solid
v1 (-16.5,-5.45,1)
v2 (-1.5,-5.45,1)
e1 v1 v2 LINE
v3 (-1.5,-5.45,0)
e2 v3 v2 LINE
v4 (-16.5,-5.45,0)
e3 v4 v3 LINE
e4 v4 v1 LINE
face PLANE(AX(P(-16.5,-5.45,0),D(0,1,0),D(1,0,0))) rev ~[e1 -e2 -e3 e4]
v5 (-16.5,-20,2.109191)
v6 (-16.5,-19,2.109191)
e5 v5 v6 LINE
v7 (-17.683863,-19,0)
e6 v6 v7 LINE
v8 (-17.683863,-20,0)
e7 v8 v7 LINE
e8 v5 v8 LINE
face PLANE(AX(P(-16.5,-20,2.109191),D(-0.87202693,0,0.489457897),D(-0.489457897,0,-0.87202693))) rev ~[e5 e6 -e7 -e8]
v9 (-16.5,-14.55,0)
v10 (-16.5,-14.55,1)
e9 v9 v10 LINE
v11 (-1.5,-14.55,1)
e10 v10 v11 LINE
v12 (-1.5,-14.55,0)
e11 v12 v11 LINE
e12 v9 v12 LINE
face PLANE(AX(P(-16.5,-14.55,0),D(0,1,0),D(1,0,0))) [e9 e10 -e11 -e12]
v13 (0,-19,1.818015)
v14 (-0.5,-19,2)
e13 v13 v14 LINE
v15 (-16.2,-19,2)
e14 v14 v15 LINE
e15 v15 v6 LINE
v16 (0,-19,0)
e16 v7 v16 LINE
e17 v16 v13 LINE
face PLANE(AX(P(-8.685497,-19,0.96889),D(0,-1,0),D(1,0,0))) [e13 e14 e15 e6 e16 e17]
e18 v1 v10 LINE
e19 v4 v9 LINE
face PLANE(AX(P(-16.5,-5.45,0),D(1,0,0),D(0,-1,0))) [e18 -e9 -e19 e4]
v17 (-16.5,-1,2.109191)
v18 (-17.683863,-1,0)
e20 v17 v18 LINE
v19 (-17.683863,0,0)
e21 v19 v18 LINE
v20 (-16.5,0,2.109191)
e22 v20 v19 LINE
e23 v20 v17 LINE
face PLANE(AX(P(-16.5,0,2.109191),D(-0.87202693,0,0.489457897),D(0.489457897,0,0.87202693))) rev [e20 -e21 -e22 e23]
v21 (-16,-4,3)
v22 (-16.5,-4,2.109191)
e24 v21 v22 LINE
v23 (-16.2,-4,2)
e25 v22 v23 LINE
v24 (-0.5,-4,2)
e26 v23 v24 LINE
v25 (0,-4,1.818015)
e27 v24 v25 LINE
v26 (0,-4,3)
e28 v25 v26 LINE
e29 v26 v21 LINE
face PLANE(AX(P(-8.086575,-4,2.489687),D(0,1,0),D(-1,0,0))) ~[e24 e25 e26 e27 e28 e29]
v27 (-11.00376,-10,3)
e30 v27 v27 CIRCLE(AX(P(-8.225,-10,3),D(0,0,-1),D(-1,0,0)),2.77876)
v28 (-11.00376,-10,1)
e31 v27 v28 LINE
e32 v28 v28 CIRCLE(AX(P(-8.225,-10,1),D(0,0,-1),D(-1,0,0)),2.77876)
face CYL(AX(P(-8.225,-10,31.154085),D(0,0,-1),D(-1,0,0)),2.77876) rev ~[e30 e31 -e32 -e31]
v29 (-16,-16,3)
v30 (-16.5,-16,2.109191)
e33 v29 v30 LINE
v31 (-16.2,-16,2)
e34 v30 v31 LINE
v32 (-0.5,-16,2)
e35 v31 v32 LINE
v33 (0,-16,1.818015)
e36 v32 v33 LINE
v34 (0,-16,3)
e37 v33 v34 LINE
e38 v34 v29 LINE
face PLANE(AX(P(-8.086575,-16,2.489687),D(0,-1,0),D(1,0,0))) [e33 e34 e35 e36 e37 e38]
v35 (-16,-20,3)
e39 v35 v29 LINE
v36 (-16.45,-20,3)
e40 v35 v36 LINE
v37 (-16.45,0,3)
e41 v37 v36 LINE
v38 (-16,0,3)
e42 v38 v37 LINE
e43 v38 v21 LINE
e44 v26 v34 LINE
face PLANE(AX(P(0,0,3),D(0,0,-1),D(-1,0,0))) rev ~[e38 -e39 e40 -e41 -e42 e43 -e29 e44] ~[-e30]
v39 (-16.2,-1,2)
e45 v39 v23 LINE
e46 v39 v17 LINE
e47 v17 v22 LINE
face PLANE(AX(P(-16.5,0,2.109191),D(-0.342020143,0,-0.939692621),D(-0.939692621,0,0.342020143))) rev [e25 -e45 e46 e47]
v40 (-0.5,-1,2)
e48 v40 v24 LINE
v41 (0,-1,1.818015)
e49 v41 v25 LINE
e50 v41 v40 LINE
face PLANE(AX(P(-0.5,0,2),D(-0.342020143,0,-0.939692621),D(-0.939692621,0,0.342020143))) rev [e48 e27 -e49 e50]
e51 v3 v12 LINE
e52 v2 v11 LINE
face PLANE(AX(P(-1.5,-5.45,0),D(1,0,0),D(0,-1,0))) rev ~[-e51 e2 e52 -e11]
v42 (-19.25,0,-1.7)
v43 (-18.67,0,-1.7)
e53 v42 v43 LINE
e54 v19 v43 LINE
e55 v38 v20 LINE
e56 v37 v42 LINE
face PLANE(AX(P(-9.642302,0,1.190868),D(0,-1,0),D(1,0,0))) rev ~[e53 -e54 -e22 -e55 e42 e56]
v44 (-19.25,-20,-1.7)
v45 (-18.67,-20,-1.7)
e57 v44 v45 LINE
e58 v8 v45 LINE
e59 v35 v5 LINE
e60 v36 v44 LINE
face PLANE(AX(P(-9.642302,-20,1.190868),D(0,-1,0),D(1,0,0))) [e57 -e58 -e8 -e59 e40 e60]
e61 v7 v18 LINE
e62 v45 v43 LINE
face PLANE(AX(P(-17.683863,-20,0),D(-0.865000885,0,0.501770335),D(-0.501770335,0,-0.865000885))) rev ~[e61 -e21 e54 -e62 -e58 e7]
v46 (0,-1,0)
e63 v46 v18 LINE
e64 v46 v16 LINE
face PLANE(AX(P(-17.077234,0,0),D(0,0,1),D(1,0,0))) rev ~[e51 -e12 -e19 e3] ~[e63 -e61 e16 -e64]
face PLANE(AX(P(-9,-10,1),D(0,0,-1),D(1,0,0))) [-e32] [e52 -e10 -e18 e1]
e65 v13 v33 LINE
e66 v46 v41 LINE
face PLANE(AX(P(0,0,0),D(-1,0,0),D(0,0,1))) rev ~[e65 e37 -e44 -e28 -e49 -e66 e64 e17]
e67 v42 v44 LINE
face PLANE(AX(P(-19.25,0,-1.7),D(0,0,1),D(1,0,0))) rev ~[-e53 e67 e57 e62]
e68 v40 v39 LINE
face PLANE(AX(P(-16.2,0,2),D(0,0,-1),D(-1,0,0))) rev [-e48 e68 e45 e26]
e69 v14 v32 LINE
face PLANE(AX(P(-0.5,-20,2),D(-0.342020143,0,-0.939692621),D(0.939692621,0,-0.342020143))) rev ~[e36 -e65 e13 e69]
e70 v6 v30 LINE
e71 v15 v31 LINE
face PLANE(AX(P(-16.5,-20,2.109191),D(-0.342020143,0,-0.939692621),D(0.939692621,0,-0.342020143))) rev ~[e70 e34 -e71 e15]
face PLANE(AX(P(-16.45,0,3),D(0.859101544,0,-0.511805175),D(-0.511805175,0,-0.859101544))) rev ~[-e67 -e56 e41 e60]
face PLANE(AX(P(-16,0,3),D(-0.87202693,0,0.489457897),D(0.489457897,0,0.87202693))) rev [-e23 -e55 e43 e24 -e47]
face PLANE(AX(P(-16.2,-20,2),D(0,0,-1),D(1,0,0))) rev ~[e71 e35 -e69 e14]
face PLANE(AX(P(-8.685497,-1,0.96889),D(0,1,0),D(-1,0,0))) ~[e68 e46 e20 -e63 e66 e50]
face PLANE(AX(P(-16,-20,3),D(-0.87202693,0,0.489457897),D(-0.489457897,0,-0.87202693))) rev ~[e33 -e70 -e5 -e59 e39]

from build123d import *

# Parameters (mm, degrees)
F1_DEPTH  = 20
F3_DEPTH  = 4
F5_DEPTH  = 1
F7_DEPTH  = 20.001
F10_W     = 15
F10_H     = 9.1
F11_DEPTH = 1
F12_D     = 5.55752


# Not quite as in the source:
# - a pattern or mirror of a feature is missing from the dataset's text; its kind, count and spacing are read off the source's solid


with BuildPart() as f1:
    # F0 (on Front) → F1 (new body)
    with BuildSketch(Plane.XZ):
        Polygon((-16.45, 3), (-19.25, -1.7), (-18.09, -1.7), (-17.0772340426, 0), (0, 0), (0, 3), align=None)
    extrude(amount=F1_DEPTH)

    # F2 (on face) → F3 (cut)
    with BuildSketch(Plane.XZ.offset(20)):
        Polygon((-16.2, 2), (-0.5, 2), (0, 1.8180148829), (0, 3), (-16, 3), (-16.5, 2.1091910703), align=None)
    f3 = extrude(amount=-F3_DEPTH, mode=Mode.SUBTRACT)

    # F3_copies: F3 across plane
    add(f3.mirror(Plane.ZX.offset(-10)), mode=Mode.SUBTRACT)

    # F4 (on face) → F5 (cut)
    with BuildSketch(Plane.XZ.offset(20)):
        Polygon((0, 0), (0, 1.8180148829), (-0.5, 2), (-16.2, 2), (-16.5, 2.1091910703), (-17.683862779, 0), align=None)
    f5 = extrude(amount=-F5_DEPTH, mode=Mode.SUBTRACT)

    # F5_copies: F5 across plane
    add(f5.mirror(Plane.ZX.offset(-10)), mode=Mode.SUBTRACT)

    # F6 (on face) → F7 (cut, through all)
    with BuildSketch(Plane.XZ.offset(20)):
        Polygon((-18.67, -1.7), (-18.09, -1.7), (-17.0772340426, 0), (-17.683862779, 0), align=None)
    extrude(amount=-F7_DEPTH, mode=Mode.SUBTRACT)

    # F10 (on face) → F11 (cut)
    with BuildSketch(Plane(origin=(0, 0, 0), x_dir=(1, 0, 0), z_dir=(0, 0, -1))):
        with Locations((-9, 10)):
            Rectangle(F10_W, F10_H)
    extrude(amount=-F11_DEPTH, mode=Mode.SUBTRACT)

    # F12 (through all)
    with Locations(Plane.XY.offset(3)):
        with Locations((-8.225, -10)):
            Hole(F12_D / 2)


solid = f1.part
